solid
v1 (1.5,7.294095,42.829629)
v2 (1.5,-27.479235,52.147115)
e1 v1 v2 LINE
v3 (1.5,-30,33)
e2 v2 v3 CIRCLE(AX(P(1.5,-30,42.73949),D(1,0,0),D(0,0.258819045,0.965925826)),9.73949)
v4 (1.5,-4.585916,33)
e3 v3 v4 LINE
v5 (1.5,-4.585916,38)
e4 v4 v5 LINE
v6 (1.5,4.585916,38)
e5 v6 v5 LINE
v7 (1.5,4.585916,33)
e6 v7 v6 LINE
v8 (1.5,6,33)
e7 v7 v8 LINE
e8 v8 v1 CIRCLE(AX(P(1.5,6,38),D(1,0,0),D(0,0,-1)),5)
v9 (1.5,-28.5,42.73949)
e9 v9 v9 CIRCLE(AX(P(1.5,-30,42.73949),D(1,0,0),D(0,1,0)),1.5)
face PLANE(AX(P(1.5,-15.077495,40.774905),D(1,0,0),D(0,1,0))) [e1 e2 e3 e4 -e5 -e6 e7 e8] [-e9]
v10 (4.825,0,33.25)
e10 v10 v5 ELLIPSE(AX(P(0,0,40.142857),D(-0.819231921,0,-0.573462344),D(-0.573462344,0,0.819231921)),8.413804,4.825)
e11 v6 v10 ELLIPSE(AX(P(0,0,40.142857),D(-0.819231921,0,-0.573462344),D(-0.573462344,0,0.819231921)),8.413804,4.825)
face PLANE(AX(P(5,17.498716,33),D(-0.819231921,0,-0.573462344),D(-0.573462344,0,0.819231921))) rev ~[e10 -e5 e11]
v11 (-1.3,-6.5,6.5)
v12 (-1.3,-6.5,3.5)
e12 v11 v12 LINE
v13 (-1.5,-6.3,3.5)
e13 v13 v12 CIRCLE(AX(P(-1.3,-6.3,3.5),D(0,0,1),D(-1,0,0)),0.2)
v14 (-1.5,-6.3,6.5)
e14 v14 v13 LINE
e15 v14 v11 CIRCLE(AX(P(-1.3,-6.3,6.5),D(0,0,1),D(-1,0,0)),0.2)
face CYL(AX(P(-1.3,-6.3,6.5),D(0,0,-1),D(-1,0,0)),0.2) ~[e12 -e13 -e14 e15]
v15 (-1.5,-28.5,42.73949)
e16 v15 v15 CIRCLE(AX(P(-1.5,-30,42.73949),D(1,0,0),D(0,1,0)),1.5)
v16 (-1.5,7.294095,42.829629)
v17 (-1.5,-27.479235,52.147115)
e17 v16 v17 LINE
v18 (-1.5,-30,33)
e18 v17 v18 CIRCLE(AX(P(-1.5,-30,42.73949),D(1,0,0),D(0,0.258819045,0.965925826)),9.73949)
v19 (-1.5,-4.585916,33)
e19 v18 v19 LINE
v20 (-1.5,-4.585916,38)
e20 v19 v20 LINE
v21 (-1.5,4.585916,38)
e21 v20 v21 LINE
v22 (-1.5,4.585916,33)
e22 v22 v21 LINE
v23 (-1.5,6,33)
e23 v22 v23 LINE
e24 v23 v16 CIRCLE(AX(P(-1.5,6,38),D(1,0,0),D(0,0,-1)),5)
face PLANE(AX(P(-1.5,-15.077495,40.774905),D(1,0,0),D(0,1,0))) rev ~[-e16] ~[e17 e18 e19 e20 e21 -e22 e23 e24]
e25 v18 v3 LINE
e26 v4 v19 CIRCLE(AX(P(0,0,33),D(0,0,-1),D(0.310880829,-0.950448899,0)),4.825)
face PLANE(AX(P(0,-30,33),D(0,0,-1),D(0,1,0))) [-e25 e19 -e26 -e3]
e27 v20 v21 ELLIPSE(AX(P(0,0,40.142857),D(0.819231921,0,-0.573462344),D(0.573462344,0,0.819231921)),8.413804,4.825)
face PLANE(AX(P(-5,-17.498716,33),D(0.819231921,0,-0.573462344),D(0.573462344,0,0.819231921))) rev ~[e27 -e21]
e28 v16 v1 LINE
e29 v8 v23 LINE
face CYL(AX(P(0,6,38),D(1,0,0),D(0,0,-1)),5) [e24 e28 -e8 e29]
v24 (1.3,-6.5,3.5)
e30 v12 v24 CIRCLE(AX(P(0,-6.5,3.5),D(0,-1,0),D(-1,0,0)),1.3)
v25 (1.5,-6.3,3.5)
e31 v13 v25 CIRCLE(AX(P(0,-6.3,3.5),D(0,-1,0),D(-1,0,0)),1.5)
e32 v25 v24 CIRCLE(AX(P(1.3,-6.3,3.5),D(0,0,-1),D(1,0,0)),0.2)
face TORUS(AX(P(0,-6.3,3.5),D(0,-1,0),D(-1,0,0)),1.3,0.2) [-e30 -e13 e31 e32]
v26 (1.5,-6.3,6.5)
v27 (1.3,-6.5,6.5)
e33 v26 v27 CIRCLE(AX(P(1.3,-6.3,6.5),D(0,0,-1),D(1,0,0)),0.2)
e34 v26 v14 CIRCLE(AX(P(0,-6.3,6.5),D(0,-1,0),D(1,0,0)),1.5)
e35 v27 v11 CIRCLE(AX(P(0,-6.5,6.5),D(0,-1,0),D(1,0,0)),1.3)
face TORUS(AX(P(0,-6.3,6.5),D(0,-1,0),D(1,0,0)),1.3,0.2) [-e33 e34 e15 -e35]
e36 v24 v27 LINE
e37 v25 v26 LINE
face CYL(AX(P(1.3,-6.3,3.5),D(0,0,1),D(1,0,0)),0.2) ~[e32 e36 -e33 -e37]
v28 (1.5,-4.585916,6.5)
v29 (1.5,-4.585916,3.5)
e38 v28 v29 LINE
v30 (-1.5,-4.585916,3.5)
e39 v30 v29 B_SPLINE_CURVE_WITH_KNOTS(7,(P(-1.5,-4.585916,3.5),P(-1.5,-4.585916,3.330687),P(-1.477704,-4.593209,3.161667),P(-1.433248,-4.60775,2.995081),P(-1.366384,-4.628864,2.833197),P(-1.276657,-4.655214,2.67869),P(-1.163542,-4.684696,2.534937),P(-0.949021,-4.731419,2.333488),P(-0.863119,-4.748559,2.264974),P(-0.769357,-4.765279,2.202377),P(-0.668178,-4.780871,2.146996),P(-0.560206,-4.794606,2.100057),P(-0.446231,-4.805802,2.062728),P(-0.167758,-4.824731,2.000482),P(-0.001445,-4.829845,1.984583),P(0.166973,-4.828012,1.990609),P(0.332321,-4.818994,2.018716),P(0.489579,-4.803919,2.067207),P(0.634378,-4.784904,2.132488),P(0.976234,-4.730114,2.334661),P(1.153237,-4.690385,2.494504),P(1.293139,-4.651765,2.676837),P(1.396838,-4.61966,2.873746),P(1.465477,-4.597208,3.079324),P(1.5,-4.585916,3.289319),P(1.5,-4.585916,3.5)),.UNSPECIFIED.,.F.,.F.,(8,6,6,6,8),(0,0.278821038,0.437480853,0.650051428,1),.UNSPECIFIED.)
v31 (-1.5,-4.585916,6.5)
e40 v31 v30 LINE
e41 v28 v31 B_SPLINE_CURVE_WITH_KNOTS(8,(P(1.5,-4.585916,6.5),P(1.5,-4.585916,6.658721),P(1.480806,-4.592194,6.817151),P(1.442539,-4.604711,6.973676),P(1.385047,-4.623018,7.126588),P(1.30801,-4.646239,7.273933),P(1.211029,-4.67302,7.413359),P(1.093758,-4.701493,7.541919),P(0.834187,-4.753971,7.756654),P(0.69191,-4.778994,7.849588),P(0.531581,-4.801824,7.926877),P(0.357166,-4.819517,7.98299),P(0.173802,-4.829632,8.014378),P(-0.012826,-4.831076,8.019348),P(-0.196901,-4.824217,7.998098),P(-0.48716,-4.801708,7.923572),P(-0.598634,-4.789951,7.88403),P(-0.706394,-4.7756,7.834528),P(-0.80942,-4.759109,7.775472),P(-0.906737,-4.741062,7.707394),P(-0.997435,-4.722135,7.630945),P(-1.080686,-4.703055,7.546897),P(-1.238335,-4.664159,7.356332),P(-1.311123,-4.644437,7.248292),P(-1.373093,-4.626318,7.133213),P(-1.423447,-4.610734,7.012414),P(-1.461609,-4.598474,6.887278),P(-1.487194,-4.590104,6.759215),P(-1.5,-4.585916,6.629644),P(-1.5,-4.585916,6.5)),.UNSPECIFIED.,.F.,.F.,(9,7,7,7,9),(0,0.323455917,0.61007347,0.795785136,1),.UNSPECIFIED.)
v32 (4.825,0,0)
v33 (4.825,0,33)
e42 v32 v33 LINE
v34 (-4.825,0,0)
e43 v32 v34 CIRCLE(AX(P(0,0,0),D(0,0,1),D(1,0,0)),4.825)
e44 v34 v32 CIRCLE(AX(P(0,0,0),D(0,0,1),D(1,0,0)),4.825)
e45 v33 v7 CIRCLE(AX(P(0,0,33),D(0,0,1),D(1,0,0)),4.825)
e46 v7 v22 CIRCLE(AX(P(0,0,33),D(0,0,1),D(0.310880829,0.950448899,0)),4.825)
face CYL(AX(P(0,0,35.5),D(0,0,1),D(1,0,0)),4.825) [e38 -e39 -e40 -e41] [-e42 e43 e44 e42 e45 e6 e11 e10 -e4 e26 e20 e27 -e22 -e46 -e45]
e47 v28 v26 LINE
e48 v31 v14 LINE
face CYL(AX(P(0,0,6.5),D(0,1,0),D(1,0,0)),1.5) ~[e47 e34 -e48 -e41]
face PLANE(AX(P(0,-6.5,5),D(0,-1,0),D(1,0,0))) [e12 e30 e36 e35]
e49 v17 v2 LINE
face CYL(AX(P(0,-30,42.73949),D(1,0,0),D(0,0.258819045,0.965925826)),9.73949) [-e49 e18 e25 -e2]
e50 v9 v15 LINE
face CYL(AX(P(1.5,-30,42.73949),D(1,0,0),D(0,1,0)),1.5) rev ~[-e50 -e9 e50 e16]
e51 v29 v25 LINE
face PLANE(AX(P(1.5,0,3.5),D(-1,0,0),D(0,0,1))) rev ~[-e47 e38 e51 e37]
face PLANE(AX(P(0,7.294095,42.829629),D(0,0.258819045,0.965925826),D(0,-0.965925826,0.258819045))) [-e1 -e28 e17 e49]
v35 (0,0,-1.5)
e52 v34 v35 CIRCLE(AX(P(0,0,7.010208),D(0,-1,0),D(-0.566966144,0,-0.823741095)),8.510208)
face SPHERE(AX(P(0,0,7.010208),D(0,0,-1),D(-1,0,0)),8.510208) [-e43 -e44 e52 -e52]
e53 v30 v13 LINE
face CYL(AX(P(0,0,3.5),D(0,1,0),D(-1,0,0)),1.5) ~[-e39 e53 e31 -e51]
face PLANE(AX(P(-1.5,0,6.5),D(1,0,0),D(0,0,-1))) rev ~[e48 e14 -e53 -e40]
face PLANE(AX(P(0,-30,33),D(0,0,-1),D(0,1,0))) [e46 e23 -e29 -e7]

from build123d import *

# Parameters (mm, degrees)
F0_R          = 4.825
F1_DEPTH      = 33
F3_DEPTH      = 6.5
F4_R          = 0.2
F8_DEPTH      = 1.5
F8_DEPTH_BACK = 1.5
F9_T4_DEPTH   = 34.9974315038
F9_S5_R       = 4.825
F9_T6_DEPTH   = 19
F9_T10_DEPTH  = 34.9974315038
F9_S11_R      = 4.825
F9_T12_DEPTH  = 19
F11_R         = 1.5
F12_DEPTH     = 6.3260001


# Not quite as in the source:
# - a fillet or chamfer that OpenCascade refuses, or shapes differently, is made with other operations: its cross-section is extruded or revolved along the edge and cut away or added
# - a feature of the source that left no trace in its solid (it failed there, or was rolled back) is left out


with BuildPart() as f1:
    # F0 (on Top) → F1 (new body)
    with BuildSketch(Plane.XY):
        Circle(F0_R)
    extrude(amount=F1_DEPTH)

    # F2 (on Front) → F3 (join)
    with BuildSketch(Plane.XZ):
        with BuildLine():
            ThreePointArc((-1.5, 3.5), (0, 2), (1.5, 3.5))
            Line((1.5, 3.5), (1.5, 6.5))
            ThreePointArc((1.5, 6.5), (0, 8), (-1.5, 6.5))
            Line((-1.5, 6.5), (-1.5, 3.5))
        make_face()
    extrude(amount=F3_DEPTH)

    # F4
    f4_edges = [f1.edges().sort_by_distance(p)[0] for p in [
        (0, -6.5, 2),
        (1.5, -6.5, 5),
        (0, -6.5, 8),
        (-1.5, -6.5, 5),
    ]]
    fillet(f4_edges, radius=F4_R)

    # F5 (on Front) → F6 (revolve)
    with BuildSketch(Plane.XZ):
        with BuildLine():
            Line((0, 0), (-4.825, 0))
            ThreePointArc((-4.825, 0), (-2.5263919431, -1.1163524169), (0, -1.5))
            Line((0, -1.5), (0, 0))
        make_face()
    revolve(axis=Axis((0, 0, -1.4078605181), (0, 0, -1)))

    # F7 (on Right) → F8 (join, two sides)
    with BuildSketch(Plane.YZ) as f8_sk:
        with BuildLine():
            ThreePointArc((6, 33), (10.9572243069, 37.3473690389), (7.2940952255, 42.8296291314))
            Line((7.2940952255, 42.8296291314), (-27.4792345209, 52.1471147551))
            ThreePointArc((-27.4792345209, 52.1471147551), (-39.6561672268, 44.0107484457), (-30, 33))
            Line((-30, 33), (-6, 33))
            Line((-6, 33), (6, 33))
        make_face()
    extrude(amount=F8_DEPTH)
    extrude(f8_sk.sketch, amount=-F8_DEPTH_BACK)

    # F9: chamfer of 3.5 x 5 on 2 edges, made by hand


with BuildPart() as f9_tool2:
    # F9_s3 → F9_t4 (new body)
    with BuildSketch(Plane.XZ.offset(-17.4987157519)):
        Polygon((5, 33), (1.5, 38), (1.5, 33), align=None)
    extrude(amount=F9_T4_DEPTH)

    # F9_s5 → F9_t6 (intersect, symmetric)
    with BuildSketch(Plane.XY.offset(35.5)):
        Circle(F9_S5_R)
    extrude(amount=F9_T6_DEPTH, both=True, mode=Mode.INTERSECT)


with BuildPart() as f1_1:
    add(f1.part)

    # F9_t1: union F9_tool2
    add(f9_tool2.part)


with BuildPart() as f9_tool8:
    # F9_s9 → F9_t10 (new body)
    with BuildSketch(Plane.XZ.offset(17.4987157519)):
        Polygon((-5, 33), (-1.5, 38), (-1.5, 33), align=None)
    extrude(amount=-F9_T10_DEPTH)

    # F9_s11 → F9_t12 (intersect, symmetric)
    with BuildSketch(Plane.XY.offset(35.5)):
        Circle(F9_S11_R)
    extrude(amount=F9_T12_DEPTH, both=True, mode=Mode.INTERSECT)


with BuildPart() as f1_2:
    add(f1_1.part)

    # F9_t7: union F9_tool8
    add(f9_tool8.part)

    # F11 (on face) → F12 (cut, through all)
    with BuildSketch(Plane.YZ.offset(1.5)):
        with Locations((-30, 42.7394899131)):
            Circle(F11_R)
    extrude(amount=-F12_DEPTH, mode=Mode.SUBTRACT)


solid = f1_2.part
